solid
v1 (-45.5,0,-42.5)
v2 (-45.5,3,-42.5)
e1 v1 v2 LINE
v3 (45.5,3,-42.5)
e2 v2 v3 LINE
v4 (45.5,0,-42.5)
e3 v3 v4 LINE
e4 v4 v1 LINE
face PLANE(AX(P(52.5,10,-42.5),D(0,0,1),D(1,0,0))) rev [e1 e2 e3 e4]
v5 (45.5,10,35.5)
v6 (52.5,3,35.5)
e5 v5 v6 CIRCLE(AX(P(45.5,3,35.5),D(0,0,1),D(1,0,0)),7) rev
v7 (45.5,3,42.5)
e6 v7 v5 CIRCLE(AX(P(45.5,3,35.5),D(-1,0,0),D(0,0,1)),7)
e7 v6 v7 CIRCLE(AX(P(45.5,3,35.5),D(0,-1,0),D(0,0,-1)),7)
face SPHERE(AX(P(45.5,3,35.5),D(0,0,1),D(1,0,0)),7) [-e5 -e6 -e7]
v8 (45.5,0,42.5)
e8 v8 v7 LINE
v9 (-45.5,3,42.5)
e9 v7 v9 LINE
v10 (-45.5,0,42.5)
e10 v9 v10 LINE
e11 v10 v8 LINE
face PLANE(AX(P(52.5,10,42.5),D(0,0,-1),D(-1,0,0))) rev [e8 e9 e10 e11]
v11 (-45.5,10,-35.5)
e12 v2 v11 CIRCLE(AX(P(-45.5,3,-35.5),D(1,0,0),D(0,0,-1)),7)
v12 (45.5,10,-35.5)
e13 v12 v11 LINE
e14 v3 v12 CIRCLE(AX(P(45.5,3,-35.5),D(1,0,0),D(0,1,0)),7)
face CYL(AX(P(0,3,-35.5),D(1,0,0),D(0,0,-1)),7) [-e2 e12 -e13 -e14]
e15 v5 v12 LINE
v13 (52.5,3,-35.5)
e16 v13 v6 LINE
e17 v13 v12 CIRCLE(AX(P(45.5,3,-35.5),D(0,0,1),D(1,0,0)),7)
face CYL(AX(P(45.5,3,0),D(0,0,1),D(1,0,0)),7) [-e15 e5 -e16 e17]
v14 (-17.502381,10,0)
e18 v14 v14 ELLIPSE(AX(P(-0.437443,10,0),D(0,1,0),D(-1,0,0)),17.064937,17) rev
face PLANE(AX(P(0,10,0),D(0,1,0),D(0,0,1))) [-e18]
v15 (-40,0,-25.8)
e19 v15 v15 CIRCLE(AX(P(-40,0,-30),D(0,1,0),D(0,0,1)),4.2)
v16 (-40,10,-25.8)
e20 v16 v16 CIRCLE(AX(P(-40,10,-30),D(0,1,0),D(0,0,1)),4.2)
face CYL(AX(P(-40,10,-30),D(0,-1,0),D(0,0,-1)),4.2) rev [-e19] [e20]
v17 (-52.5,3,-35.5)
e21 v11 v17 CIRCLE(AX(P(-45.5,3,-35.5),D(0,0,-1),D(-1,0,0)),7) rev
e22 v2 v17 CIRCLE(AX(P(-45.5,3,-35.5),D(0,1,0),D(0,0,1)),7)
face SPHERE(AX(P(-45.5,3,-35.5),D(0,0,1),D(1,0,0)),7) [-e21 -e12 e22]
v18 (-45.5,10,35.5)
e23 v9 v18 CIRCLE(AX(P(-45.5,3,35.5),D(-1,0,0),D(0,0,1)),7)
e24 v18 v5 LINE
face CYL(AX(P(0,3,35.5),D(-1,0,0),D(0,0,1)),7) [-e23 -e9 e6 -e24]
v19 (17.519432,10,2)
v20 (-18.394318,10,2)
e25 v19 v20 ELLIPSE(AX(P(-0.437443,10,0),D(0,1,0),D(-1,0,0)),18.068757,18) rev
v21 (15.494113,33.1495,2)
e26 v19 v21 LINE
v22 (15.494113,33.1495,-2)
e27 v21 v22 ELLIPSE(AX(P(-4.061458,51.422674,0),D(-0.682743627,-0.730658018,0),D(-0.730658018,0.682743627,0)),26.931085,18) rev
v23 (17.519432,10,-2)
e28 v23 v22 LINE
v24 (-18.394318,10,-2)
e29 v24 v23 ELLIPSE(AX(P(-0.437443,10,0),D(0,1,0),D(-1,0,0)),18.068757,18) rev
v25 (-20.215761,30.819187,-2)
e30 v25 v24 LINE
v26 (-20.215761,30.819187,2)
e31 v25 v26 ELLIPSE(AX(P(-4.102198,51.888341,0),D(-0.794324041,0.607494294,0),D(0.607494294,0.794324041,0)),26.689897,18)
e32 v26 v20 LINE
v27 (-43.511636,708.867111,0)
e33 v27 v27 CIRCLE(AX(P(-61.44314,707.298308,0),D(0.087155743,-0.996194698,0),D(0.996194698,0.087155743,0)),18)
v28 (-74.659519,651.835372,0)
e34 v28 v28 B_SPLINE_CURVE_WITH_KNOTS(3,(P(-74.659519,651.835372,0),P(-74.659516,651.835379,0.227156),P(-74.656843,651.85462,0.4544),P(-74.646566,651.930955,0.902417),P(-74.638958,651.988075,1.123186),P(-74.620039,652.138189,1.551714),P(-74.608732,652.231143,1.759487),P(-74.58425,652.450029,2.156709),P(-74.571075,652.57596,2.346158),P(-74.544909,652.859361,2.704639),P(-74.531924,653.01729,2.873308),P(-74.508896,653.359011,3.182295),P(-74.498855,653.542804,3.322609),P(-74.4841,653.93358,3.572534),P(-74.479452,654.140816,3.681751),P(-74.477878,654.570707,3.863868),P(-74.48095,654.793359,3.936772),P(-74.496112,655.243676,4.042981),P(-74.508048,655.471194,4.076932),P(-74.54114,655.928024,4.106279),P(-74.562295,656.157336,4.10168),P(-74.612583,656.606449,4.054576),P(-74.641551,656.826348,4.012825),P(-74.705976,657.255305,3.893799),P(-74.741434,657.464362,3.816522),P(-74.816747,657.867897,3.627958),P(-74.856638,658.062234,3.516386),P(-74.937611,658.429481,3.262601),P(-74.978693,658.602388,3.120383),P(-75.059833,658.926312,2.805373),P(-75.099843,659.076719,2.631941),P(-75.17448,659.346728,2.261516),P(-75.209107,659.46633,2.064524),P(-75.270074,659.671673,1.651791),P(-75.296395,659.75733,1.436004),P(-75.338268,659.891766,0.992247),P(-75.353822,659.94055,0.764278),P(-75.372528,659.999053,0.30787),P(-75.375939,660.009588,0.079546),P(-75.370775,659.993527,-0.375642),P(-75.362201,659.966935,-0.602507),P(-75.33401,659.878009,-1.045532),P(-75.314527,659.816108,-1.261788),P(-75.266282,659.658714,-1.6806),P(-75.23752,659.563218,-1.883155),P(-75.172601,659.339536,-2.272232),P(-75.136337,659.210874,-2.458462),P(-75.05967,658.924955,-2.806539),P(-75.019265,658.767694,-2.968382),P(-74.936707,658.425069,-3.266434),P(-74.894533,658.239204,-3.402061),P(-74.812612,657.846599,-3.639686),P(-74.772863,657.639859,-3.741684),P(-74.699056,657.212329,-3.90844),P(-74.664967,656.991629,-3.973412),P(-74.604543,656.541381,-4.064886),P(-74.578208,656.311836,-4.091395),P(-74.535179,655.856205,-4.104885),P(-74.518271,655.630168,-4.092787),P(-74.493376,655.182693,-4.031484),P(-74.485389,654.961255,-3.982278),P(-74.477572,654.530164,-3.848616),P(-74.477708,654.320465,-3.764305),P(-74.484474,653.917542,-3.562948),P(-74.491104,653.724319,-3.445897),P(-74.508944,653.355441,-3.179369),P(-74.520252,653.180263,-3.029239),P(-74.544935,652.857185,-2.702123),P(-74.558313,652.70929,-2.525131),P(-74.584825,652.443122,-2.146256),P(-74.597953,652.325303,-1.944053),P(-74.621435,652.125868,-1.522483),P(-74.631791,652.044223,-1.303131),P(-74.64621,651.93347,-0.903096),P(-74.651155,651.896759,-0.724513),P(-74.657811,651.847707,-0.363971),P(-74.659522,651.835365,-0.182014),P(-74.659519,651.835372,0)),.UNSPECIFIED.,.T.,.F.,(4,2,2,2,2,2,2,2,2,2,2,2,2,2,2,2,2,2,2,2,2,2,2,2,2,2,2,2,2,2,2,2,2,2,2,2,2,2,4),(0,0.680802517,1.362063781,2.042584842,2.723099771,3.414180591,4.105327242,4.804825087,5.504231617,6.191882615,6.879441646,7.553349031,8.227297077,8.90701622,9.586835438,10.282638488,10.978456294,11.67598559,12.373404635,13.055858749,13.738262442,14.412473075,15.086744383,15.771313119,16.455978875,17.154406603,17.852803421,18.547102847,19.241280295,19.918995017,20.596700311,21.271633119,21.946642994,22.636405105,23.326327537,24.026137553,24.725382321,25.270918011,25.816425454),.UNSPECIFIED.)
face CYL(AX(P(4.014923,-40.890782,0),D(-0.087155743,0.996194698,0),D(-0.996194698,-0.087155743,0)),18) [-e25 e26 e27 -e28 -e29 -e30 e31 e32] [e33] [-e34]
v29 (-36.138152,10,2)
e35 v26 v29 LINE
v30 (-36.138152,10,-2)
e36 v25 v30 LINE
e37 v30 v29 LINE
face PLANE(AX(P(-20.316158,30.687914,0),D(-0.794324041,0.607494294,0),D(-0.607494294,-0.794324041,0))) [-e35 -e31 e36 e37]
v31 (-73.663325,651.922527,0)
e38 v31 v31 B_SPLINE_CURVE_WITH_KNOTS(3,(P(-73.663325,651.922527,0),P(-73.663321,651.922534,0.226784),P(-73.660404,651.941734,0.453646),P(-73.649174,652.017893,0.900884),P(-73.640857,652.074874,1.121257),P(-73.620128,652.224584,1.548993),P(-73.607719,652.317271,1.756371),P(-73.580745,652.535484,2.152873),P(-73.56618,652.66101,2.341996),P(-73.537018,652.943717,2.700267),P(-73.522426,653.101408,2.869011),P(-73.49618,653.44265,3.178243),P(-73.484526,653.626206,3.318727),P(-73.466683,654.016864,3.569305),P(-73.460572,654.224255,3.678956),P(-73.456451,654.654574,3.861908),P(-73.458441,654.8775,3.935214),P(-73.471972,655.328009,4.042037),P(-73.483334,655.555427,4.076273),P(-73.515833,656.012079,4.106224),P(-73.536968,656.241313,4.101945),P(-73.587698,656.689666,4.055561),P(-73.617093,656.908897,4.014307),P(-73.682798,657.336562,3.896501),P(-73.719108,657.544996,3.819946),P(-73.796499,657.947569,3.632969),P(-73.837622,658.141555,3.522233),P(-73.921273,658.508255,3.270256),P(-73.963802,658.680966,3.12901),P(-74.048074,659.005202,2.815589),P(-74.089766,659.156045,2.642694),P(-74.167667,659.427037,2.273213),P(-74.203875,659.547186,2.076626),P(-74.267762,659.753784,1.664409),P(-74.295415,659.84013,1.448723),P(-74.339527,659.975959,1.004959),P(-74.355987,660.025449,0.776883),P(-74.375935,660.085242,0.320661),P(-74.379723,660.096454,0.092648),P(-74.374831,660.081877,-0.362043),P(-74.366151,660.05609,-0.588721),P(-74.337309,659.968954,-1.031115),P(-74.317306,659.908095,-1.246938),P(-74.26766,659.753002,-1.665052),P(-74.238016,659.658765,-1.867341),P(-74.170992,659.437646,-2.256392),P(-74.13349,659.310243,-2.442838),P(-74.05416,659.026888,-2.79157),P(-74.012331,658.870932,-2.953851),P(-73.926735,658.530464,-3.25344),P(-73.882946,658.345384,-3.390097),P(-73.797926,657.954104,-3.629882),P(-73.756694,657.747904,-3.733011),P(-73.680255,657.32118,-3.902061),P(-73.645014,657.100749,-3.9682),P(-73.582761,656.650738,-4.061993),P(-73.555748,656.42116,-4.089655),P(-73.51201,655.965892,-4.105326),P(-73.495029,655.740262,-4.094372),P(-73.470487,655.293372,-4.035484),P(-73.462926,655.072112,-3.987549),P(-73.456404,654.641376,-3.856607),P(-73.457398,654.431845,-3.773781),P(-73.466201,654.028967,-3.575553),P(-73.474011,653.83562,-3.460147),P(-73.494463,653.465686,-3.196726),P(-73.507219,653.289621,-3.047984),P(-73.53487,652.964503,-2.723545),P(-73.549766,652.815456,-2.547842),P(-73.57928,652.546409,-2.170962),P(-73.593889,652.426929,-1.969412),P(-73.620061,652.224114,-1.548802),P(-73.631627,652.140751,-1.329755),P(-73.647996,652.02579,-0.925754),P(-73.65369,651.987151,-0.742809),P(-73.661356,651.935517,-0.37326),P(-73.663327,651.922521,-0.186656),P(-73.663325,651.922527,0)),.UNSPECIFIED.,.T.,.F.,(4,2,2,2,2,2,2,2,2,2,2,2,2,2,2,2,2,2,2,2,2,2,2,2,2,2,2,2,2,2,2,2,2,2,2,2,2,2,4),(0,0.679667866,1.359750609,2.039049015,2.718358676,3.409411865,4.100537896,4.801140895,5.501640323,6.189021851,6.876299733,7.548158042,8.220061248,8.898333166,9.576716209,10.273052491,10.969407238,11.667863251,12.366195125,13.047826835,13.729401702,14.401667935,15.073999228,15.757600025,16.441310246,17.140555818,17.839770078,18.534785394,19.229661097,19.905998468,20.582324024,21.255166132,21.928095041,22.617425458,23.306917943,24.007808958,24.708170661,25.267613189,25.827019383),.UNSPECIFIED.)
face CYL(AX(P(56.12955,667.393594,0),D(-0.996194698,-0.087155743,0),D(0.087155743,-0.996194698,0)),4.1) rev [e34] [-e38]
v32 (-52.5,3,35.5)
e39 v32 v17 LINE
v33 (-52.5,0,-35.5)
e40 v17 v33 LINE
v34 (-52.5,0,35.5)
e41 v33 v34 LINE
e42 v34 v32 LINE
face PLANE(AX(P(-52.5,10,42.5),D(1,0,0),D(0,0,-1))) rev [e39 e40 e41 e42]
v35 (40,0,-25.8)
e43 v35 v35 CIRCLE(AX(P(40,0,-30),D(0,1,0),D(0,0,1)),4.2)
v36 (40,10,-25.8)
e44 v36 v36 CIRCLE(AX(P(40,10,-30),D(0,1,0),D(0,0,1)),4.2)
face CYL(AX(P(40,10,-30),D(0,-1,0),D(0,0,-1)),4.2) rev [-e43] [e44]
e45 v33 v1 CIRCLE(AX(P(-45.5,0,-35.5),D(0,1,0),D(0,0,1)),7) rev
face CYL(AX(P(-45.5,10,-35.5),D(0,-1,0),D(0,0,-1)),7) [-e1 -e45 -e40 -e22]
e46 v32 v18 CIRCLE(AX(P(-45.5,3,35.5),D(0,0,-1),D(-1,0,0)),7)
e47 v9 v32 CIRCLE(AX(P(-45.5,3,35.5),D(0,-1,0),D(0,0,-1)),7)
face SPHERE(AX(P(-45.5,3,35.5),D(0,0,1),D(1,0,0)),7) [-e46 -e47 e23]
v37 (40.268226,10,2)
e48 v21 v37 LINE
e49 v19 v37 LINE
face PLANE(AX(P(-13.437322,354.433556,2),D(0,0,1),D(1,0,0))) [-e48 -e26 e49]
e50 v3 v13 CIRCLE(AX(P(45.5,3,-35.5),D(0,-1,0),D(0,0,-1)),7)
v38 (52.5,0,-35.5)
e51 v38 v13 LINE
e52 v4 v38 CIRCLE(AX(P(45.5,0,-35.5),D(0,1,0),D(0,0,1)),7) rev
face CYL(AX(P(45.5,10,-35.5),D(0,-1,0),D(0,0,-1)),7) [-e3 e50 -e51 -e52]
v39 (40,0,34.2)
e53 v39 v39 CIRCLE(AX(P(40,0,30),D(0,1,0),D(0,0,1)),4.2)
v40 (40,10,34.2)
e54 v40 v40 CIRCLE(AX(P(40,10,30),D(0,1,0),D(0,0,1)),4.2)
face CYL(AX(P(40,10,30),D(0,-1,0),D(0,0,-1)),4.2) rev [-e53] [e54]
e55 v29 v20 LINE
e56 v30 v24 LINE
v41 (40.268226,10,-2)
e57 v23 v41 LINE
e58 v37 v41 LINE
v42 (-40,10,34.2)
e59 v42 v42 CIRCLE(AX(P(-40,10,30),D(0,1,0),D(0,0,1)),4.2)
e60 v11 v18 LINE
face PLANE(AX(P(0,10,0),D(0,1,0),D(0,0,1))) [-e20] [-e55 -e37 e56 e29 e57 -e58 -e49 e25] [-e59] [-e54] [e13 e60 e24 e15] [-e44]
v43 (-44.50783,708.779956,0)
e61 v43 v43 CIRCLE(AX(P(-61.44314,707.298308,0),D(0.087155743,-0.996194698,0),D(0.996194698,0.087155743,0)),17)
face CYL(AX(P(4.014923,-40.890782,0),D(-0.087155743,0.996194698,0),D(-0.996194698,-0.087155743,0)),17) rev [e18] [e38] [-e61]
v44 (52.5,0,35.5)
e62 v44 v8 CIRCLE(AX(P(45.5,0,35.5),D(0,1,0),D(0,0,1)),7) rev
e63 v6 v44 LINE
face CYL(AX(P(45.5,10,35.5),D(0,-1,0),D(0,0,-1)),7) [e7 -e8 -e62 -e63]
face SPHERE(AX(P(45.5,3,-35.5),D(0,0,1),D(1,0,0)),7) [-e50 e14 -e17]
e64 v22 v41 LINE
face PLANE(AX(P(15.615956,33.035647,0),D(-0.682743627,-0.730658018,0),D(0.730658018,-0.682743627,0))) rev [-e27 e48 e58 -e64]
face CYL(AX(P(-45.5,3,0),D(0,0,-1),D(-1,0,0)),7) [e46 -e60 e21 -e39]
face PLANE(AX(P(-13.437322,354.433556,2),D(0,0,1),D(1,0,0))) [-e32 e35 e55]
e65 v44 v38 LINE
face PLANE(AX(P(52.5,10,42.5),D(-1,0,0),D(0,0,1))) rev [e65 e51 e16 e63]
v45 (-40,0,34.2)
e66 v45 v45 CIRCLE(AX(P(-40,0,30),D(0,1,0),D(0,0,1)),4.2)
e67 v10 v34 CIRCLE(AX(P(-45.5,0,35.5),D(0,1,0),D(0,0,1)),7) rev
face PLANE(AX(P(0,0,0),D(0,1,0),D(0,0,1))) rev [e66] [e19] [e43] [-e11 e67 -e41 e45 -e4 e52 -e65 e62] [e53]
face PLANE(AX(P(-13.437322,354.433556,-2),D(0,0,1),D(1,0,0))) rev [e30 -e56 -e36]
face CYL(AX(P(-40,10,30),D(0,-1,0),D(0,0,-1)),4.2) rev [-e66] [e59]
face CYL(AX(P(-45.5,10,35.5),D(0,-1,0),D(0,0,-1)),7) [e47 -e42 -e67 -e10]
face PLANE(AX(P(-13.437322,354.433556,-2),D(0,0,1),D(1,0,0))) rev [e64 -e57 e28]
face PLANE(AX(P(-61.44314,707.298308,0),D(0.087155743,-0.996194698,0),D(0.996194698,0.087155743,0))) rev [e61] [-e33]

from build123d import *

# Parameters (mm, degrees)
SKETCH1_W                       = 105
SKETCH1_H                       = 85
SKETCH1_R                       = 4.2
BOSS_EXTRUDE1_DEPTH             = 10
SKETCH14_R                      = 18
SKETCH14_R_2                    = 17
BOSS_EXTRUDE4_DEPTH             = 700
BOSS_EXTRUDE4_DIRECTION_2_REACH = 70.283
RIB2_REACH                      = 716.562
SKETCH21_WALL_W                 = 1464.864259786
SKETCH21_WALL_H                 = 4
RIB5_REACH                      = 716.562
SKETCH22_WALL_W                 = 1457.169117376
SKETCH22_WALL_H                 = 4
FILLET1_R                       = 7
FILLET2_R                       = 7
CUT_EXTRUDE1_REACH              = 717.102
CUT_EXTRUDE1_END_RADIUS         = 17
SKETCH26_R                      = 4.1


with BuildPart() as part:
    # Sketch1 → Boss-Extrude1 (new body)
    with BuildSketch(Plane(origin=(0, 0, 0), x_dir=(1, 0, 0), z_dir=(0, 1, 0))):
        Rectangle(SKETCH1_W, SKETCH1_H)
        with Locations(Location((-40, -30, 0), (0, 0, 270))):
            Circle(SKETCH1_R, mode=Mode.SUBTRACT)
        with Locations(Location((40, 30, 0), (0, 0, 270))):
            Circle(SKETCH1_R, mode=Mode.SUBTRACT)
        with Locations(Location((40, -30, 0), (0, 0, 270))):
            Circle(SKETCH1_R, mode=Mode.SUBTRACT)
        with Locations(Location((-40, 30, 0), (0, 0, 270))):
            Circle(SKETCH1_R, mode=Mode.SUBTRACT)
    extrude(amount=BOSS_EXTRUDE1_DEPTH)

    # Sketch14 → Boss-Extrude4 (add)
    with BuildSketch(Plane(origin=(0, 10, 0), x_dir=(-0.9961946980917459, -0.08715574274765506, 0), z_dir=(0.08715574274765506, -0.9961946980917459, 0))):
        with Locations((0.435778714, 0)):
            Circle(SKETCH14_R)
        with Locations((0.435778714, 0)):
            Circle(SKETCH14_R_2, mode=Mode.SUBTRACT)
    extrude(amount=-BOSS_EXTRUDE4_DEPTH)

    # Boss-Extrude4 direction 2: up to this face of the body (flat: up to its plane)
    boss_extrude4_direction_2_end = Plane(part.part.faces().sort_by_distance((0, 10, 0))[0])
    # Sketch14 → Boss-Extrude4 direction 2 (add, up to the picked face)
    with BuildSketch(Plane(origin=(0, 10, 0), x_dir=(-0.9961946980917459, -0.08715574274765506, 0), z_dir=(0.08715574274765506, -0.9961946980917459, 0)), mode=Mode.PRIVATE) as boss_extrude4_direction_2_sk1:
        with Locations((0.435778714, 0)):
            Circle(SKETCH14_R)
        with Locations((0.435778714, 0)):
            Circle(SKETCH14_R_2, mode=Mode.SUBTRACT)
    boss_extrude4_direction_2_tool1 = split(extrude(boss_extrude4_direction_2_sk1.sketch, amount=BOSS_EXTRUDE4_DIRECTION_2_REACH, mode=Mode.PRIVATE), bisect_by=boss_extrude4_direction_2_end, keep=Keep.BOTH, mode=Mode.PRIVATE)
    add(boss_extrude4_direction_2_tool1.solids().sort_by(Axis((16.990205, 11.48645, 0), (0.08715574274765506, -0.9961946980917459, 0)))[0])

    # Sketch21 wall → Rib2 (add, up to next)
    with BuildSketch(Plane(origin=(27.942090865, 21.517823641, 0), x_dir=(0.730658017889, -0.682743627502, 0), z_dir=(0.682743627502, 0.730658017889, 0)), mode=Mode.PRIVATE) as rib2_sk1:
        Rectangle(SKETCH21_WALL_W, SKETCH21_WALL_H)
    rib2_tool1 = extrude(rib2_sk1.sketch, amount=-RIB2_REACH, mode=Mode.PRIVATE) - part.part
    add(rib2_tool1.solids().sort_by_distance((27.942090865, 21.517823641, 0))[0])

    # Sketch22 wall → Rib5 (add, up to next)
    with BuildSketch(Plane(origin=(-28.227154914, 20.343956887, 0), x_dir=(-0.607494293968, -0.794324041432, 0), z_dir=(0.794324041432, -0.607494293968, 0)), mode=Mode.PRIVATE) as rib5_sk1:
        Rectangle(SKETCH22_WALL_W, SKETCH22_WALL_H)
    rib5_tool1 = extrude(rib5_sk1.sketch, amount=RIB5_REACH, mode=Mode.PRIVATE) - part.part
    add(rib5_tool1.solids().sort_by_distance((-28.227154914, 20.343956887, 0))[0])

    # Fillet1
    fillet1_edges = [part.edges().sort_by_distance(p)[0] for p in [
        (52.5, 10, 0),
        (-52.5, 10, 0),
        (52.5, 5, 42.5),
        (-52.5, 5, 42.5),
    ]]
    fillet(fillet1_edges, radius=FILLET1_R)

    # Fillet2
    # the kernel refuses this fillet: 7 mm, written as the material it takes off along each edge
    with BuildSketch(Plane(origin=(45.5, 3, 35.5), x_dir=(0, 1, 0), z_dir=(0, 0, 1))) as fillet2_piece_1_section:
        Polygon((0, 0), (FILLET2_R, 0), (FILLET2_R, -FILLET2_R), (0, -FILLET2_R), align=None)
    fillet2_piece_1 = extrude(amount=FILLET2_R, mode=Mode.PRIVATE)
    fillet2_piece_1 = fillet2_piece_1 - Plane(origin=(45.5, 3, 35.5), x_dir=(-0.7071067811865475, -0.7071067811865475, 0), z_dir=(0, 0, 1)) * Sphere(FILLET2_R, mode=Mode.PRIVATE)
    add(fillet2_piece_1, mode=Mode.SUBTRACT)
    with BuildSketch(Plane(origin=(-45.5, 3, 35.5), x_dir=(0, 1, 0), z_dir=(0, 0, 1))) as fillet2_piece_2_section:
        Polygon((0, 0), (FILLET2_R, 0), (FILLET2_R, FILLET2_R), (0, FILLET2_R), align=None)
    fillet2_piece_2 = extrude(amount=FILLET2_R, mode=Mode.PRIVATE)
    fillet2_piece_2 = fillet2_piece_2 - Plane(origin=(-45.5, 3, 35.5), x_dir=(0.7071067811865475, -0.7071067811865475, 0), z_dir=(0, 0, 1)) * Sphere(FILLET2_R, mode=Mode.PRIVATE)
    add(fillet2_piece_2, mode=Mode.SUBTRACT)
    with BuildSketch(Plane(origin=(-45.5, 10, -42.5), x_dir=(0, 0, 1), z_dir=(1, 0, 0))) as fillet2_piece_3:
        with BuildLine():
            CenterArc((FILLET2_R, FILLET2_R), FILLET2_R, 180, 90)
            Line((0, FILLET2_R), (0, 0))
            Line((0, 0), (FILLET2_R, 0))
        make_face()
    extrude(amount=91, mode=Mode.SUBTRACT)
    with BuildSketch(Plane(origin=(45.5, 10, 42.5), x_dir=(0, -1, 0), z_dir=(-1, 0, 0))) as fillet2_piece_4:
        with BuildLine():
            CenterArc((FILLET2_R, -FILLET2_R), FILLET2_R, 90, 90)
            Line((0, -FILLET2_R), (0, 0))
            Line((0, 0), (FILLET2_R, 0))
        make_face()
    extrude(amount=91, mode=Mode.SUBTRACT)
    with BuildSketch(Plane(origin=(-52.5, -17.5, -42.5), x_dir=(0, 0, 1), z_dir=(0, 1, 0))) as fillet2_piece_5:
        with BuildLine():
            CenterArc((FILLET2_R, FILLET2_R), FILLET2_R, 180, 90)
            Line((0, FILLET2_R), (0, 0))
            Line((0, 0), (FILLET2_R, 0))
        make_face()
    extrude(amount=20.5, mode=Mode.SUBTRACT)
    with BuildSketch(Plane(origin=(52.5, -17.5, -42.5), x_dir=(0, 0, 1), z_dir=(0, 1, 0))) as fillet2_piece_6:
        with BuildLine():
            CenterArc((FILLET2_R, -FILLET2_R), FILLET2_R, 90, 90)
            Line((0, -FILLET2_R), (0, 0))
            Line((0, 0), (FILLET2_R, 0))
        make_face()
    extrude(amount=20.5, mode=Mode.SUBTRACT)
    with BuildSketch(Plane(origin=(-45.5, 3, -42.5), x_dir=(-1, 0, 0), z_dir=(0, -1, 0))) as fillet2_piece_7:
        with BuildLine():
            CenterArc((7 - FILLET2_R, -FILLET2_R), FILLET2_R, 0, 90)
            Line((7, -FILLET2_R), (7, 0))
            Line((7, 0), (7 - FILLET2_R, 0))
        make_face()
    revolve(axis=Axis((-45.5, 3, -42.5), (0, 0, -1)), revolution_arc=90, mode=Mode.SUBTRACT)
    with BuildSketch(Plane(origin=(45.5, 3, -42.5), x_dir=(1, 0, 0), z_dir=(0, -1, 0))) as fillet2_piece_8:
        with BuildLine():
            CenterArc((7 - FILLET2_R, FILLET2_R), FILLET2_R, 270, 90)
            Line((7, FILLET2_R), (7, 0))
            Line((7, 0), (7 - FILLET2_R, 0))
        make_face()
    revolve(axis=Axis((45.5, 3, -42.5), (0, 0, 1)), revolution_arc=90, mode=Mode.SUBTRACT)

    # Cut-Extrude1: up to this cylinder (the profile starts outside it)
    cut_extrude1_end = Plane(origin=(-57.085353251, 657.488573385, 0), z_dir=(-0.08715574274765504, 0.9961946980917459, 0)) * Cylinder(CUT_EXTRUDE1_END_RADIUS, 1469.204, mode=Mode.PRIVATE)
    # Sketch26 → Cut-Extrude1 (cut, up to the surface)
    with BuildSketch(Plane(origin=(-17.497384121, -1.530822752, 0), x_dir=(0, 0, 1), z_dir=(-0.9961946980917459, -0.08715574274765504, 0)), mode=Mode.PRIVATE) as cut_extrude1_sk1:
        with Locations(Location((0, 659.961946981, 0), (0, 0, 270))):
            Circle(SKETCH26_R)
    cut_extrude1_tool1 = extrude(cut_extrude1_sk1.sketch, amount=-CUT_EXTRUDE1_REACH, mode=Mode.PRIVATE) - cut_extrude1_end
    add(cut_extrude1_tool1.solids().sort_by_distance((-75.016858, 655.91977, 0))[0], mode=Mode.SUBTRACT)


solid = part.part
